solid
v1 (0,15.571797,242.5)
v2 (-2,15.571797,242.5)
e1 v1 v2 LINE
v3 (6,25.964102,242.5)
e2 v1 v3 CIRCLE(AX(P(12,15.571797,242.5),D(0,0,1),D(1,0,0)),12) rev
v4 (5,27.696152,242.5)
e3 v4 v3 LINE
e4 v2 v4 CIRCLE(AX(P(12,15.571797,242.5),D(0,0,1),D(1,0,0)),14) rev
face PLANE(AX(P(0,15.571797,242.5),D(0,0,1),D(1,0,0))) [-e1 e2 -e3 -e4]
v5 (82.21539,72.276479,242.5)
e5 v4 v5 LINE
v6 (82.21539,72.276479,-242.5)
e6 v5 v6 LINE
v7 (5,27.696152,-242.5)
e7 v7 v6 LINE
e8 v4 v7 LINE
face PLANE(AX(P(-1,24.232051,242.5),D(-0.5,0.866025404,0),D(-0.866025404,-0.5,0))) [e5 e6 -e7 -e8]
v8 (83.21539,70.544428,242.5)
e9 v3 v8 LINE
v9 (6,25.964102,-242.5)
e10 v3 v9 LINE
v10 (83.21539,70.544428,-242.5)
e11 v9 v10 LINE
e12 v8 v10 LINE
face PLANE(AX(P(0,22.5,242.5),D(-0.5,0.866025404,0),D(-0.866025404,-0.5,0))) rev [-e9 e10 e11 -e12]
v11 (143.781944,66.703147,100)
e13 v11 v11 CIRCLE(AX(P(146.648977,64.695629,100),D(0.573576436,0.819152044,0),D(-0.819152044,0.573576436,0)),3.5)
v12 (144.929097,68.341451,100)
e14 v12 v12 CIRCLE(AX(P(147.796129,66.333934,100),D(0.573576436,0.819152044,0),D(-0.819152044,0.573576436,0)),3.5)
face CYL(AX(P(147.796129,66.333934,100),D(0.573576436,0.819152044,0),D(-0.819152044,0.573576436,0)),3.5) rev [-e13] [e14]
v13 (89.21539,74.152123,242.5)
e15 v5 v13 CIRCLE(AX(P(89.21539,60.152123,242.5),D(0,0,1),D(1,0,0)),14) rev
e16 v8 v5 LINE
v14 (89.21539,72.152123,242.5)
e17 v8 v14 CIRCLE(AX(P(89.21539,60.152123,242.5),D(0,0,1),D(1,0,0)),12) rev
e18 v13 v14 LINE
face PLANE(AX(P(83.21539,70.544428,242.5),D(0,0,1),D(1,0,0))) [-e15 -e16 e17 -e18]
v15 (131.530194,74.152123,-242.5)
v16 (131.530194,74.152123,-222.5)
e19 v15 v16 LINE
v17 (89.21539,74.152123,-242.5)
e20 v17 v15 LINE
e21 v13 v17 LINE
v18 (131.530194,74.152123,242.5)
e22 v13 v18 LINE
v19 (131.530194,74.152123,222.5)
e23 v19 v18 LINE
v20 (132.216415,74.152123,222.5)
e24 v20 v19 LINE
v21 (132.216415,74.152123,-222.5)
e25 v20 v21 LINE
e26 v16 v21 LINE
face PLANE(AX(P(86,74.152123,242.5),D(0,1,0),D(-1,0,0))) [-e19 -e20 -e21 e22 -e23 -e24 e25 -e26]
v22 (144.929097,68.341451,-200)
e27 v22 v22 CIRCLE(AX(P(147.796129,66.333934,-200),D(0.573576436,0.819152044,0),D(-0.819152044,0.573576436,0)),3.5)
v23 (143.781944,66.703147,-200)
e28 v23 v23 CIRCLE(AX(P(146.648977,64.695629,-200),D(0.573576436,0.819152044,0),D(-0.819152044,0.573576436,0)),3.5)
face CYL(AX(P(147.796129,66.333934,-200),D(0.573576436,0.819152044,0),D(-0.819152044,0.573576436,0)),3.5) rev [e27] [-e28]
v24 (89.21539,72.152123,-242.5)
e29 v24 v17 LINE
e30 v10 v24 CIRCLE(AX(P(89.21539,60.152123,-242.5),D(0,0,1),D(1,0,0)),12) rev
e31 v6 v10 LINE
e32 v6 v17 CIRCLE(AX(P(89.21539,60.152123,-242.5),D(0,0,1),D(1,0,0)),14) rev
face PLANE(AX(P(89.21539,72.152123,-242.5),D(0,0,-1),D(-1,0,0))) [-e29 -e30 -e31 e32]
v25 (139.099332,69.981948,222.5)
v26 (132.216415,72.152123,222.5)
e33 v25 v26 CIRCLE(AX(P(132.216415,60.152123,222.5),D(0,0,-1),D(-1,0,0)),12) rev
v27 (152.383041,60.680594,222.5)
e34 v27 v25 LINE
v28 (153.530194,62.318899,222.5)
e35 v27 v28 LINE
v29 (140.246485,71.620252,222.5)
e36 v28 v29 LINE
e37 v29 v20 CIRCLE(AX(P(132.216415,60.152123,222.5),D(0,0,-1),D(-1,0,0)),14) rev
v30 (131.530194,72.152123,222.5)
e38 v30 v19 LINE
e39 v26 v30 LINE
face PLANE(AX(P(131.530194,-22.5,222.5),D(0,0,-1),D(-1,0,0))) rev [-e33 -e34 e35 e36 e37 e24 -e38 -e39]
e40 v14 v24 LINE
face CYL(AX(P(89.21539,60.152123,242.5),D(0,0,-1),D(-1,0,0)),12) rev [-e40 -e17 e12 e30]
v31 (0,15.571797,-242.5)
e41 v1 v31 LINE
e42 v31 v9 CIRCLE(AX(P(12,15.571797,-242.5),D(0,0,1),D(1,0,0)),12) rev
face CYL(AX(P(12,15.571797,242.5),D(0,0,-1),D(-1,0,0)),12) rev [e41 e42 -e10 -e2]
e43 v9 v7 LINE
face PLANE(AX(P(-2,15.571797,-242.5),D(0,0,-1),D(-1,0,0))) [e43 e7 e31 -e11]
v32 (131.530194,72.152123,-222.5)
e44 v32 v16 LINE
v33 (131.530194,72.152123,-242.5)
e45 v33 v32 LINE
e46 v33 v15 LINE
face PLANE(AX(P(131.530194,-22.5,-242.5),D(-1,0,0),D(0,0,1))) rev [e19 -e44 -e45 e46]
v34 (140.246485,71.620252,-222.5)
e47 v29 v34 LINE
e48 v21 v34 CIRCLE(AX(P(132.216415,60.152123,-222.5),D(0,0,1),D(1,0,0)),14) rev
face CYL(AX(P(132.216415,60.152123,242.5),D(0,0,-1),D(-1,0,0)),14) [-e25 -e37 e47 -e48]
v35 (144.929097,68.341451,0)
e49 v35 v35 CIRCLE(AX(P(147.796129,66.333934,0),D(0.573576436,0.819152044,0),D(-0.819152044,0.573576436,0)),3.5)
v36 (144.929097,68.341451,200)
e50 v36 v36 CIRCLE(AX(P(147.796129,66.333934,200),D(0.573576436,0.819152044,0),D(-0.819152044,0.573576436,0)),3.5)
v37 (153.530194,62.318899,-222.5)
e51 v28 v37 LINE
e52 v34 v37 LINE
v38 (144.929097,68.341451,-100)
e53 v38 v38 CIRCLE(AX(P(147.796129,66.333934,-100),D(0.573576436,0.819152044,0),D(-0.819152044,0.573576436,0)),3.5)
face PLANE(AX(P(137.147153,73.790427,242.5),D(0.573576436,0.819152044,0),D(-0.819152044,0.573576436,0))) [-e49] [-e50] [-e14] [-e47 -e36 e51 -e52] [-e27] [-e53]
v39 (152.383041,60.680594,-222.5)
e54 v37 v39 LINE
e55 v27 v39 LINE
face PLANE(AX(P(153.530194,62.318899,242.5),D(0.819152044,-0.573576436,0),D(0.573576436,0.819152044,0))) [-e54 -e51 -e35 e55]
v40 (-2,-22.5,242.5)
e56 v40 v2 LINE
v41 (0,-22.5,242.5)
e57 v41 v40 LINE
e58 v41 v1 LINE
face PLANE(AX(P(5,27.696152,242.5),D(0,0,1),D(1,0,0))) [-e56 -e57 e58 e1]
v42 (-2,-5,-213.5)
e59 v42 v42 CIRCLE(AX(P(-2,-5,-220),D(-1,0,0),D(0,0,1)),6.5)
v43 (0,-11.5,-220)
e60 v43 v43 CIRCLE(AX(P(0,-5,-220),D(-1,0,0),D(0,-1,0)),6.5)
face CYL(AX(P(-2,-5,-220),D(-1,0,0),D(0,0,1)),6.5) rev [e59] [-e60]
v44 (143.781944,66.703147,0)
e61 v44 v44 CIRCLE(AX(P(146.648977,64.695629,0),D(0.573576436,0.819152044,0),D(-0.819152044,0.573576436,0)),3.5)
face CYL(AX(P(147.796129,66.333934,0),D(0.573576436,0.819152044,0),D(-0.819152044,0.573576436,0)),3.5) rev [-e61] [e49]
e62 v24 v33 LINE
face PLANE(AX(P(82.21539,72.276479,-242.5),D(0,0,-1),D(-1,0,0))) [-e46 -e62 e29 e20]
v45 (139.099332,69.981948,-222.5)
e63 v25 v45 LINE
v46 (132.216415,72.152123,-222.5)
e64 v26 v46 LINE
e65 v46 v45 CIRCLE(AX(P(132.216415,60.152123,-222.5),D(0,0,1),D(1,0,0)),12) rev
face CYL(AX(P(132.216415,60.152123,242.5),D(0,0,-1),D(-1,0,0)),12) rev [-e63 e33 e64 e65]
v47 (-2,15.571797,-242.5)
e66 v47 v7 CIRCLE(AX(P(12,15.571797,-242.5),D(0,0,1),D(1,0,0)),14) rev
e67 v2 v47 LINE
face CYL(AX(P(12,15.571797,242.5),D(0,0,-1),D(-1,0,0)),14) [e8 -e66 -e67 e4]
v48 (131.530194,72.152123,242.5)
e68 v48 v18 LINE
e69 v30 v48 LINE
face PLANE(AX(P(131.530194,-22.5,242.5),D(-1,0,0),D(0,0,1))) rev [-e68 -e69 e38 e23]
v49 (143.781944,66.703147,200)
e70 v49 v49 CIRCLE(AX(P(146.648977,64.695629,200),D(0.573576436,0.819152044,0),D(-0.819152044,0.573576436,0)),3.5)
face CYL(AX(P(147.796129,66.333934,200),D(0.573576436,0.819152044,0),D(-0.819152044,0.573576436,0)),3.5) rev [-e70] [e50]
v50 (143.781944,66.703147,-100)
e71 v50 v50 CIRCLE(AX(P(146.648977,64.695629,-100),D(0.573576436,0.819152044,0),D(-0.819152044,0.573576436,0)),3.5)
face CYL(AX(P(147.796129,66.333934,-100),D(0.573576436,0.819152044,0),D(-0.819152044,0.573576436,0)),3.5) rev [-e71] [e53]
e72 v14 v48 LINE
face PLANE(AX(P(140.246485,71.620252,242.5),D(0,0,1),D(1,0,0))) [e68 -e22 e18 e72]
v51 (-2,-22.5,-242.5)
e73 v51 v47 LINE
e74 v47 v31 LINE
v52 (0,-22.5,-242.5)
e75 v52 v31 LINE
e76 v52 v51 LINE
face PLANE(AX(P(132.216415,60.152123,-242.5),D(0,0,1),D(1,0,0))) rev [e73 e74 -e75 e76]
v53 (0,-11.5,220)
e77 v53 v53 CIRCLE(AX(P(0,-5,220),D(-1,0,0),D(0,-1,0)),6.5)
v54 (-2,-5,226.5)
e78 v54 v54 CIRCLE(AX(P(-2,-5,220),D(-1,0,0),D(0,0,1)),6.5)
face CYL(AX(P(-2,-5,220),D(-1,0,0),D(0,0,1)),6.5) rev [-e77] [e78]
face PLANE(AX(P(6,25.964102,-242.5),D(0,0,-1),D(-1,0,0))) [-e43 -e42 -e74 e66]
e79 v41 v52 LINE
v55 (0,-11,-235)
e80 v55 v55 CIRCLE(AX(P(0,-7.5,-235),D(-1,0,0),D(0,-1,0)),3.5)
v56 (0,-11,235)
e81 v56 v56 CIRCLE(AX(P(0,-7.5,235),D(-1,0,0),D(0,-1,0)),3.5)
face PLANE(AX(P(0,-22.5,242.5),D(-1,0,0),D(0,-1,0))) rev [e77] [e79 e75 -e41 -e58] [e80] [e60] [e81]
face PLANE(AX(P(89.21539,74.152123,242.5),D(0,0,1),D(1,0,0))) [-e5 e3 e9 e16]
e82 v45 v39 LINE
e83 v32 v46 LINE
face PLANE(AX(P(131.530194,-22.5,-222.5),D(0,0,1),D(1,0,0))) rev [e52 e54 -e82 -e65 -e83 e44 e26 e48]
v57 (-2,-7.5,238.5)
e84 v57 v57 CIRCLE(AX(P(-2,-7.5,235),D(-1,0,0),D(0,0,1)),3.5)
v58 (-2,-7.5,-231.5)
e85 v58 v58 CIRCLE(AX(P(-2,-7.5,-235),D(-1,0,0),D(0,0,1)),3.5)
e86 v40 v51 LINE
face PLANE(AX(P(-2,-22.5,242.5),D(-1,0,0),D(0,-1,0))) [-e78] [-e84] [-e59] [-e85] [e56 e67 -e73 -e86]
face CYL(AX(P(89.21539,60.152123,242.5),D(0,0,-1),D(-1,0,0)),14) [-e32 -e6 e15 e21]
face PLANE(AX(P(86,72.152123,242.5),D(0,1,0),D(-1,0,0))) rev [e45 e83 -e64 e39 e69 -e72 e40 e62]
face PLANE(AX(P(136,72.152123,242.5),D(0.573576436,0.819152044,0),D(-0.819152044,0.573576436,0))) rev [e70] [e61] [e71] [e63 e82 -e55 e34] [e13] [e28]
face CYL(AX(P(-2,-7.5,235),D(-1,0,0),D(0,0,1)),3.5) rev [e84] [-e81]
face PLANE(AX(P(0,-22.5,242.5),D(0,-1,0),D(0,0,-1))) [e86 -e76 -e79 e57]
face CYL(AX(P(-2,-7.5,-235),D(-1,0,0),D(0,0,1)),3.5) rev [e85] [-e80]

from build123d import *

# Parameters (mm, degrees)
BASIS_BLECH1_DEPTH               = 242.5
SKIZZE4_W                        = 22
SKIZZE4_H                        = 20
SCHNITT_LINEAR_AUSTRAGEN1_DEPTH  = 303.852114579
F_7_0_7_DURCHMESSER_BOHRUNG1_D   = 7
F_13_0_13_DURCHMESSER_BOHRUNG1_D = 13
F_7_0_7_DURCHMESSER_BOHRUNG2_D   = 7


# Sheet-metal steps are written as plain solids
with BuildPart() as part:
    # Skizze1 → Basis-Blech1 (new, symmetric)
    with BuildSketch(Plane.XY):
        with BuildLine():
            Line((0, -22.5), (0, 15.57179677))
            ThreePointArc((0, 15.57179677), (1.607695155, 21.57179677), (6, 25.964101615))
            Line((6, 25.964101615), (83.215390309, 70.544427996))
            ThreePointArc((83.215390309, 70.544427996), (86.109561768, 71.743233066), (89.215390309, 72.15212315))
            Line((89.215390309, 72.15212315), (132.216414533, 72.15212315))
            ThreePointArc((132.216414533, 72.15212315), (135.824884128, 71.596726559), (139.09933177, 69.981947682))
            Line((139.09933177, 69.981947682), (152.383040886, 60.680594423))
            Line((152.383040886, 60.680594423), (153.530193758, 62.318898512))
            Line((153.530193758, 62.318898512), (140.246484642, 71.62025177))
            ThreePointArc((140.246484642, 71.62025177), (136.426295727, 73.504160461), (132.216414533, 74.15212315))
            Line((132.216414533, 74.15212315), (89.215390309, 74.15212315))
            ThreePointArc((89.215390309, 74.15212315), (85.591923678, 73.675084718), (82.215390309, 72.276478803))
            Line((82.215390309, 72.276478803), (5, 27.696152423))
            ThreePointArc((5, 27.696152423), (-0.124355653, 22.57179677), (-2, 15.57179677))
            Line((-2, 15.57179677), (-2, -22.5))
            Line((-2, -22.5), (0, -22.5))
        make_face()
    extrude(amount=BASIS_BLECH1_DEPTH, both=True)

    # Skizze4 → Schnitt-Linear austragen1 (cut, through all)
    with BuildSketch(Plane(origin=(0, 74.15212315, 0), x_dir=(1, 0, 0), z_dir=(0, 1, 0))):
        with Locations((142.530193758, 232.5)):
            Rectangle(SKIZZE4_W, SKIZZE4_H)
        with Locations((142.530193758, -232.5)):
            Rectangle(SKIZZE4_W, SKIZZE4_H)
    extrude(amount=-SCHNITT_LINEAR_AUSTRAGEN1_DEPTH, mode=Mode.SUBTRACT)

    # Ø7.0 (7) Durchmesser Bohrung1 (through all)
    with Locations(Plane(origin=(-2, 72.15212315, 0), x_dir=(0, -1, 0), z_dir=(-1, 0, 0))):
        with Locations((79.65212315, 235), (79.65212315, -235)):
            Hole(F_7_0_7_DURCHMESSER_BOHRUNG1_D / 2)

    # Ø13.0 (13) Durchmesser Bohrung1 (through all)
    with Locations(Plane.ZY.offset(2)):
        with Locations((-220, -5), (220, -5)):
            Hole(F_13_0_13_DURCHMESSER_BOHRUNG1_D / 2)

    # Ø7.0 (7) Durchmesser Bohrung2 (through all)
    with Locations(Plane(origin=(79.790191976, 113.952203628, 0), x_dir=(0, 0, -1), z_dir=(0.5735764363510463, 0.8191520442889918, 0))):
        with Locations((0, -83.019920352), (-100, -83.019920352), (-200, -83.019920352), (100, -83.019920352), (200, -83.019920352)):
            Hole(F_7_0_7_DURCHMESSER_BOHRUNG2_D / 2)


solid = part.part
